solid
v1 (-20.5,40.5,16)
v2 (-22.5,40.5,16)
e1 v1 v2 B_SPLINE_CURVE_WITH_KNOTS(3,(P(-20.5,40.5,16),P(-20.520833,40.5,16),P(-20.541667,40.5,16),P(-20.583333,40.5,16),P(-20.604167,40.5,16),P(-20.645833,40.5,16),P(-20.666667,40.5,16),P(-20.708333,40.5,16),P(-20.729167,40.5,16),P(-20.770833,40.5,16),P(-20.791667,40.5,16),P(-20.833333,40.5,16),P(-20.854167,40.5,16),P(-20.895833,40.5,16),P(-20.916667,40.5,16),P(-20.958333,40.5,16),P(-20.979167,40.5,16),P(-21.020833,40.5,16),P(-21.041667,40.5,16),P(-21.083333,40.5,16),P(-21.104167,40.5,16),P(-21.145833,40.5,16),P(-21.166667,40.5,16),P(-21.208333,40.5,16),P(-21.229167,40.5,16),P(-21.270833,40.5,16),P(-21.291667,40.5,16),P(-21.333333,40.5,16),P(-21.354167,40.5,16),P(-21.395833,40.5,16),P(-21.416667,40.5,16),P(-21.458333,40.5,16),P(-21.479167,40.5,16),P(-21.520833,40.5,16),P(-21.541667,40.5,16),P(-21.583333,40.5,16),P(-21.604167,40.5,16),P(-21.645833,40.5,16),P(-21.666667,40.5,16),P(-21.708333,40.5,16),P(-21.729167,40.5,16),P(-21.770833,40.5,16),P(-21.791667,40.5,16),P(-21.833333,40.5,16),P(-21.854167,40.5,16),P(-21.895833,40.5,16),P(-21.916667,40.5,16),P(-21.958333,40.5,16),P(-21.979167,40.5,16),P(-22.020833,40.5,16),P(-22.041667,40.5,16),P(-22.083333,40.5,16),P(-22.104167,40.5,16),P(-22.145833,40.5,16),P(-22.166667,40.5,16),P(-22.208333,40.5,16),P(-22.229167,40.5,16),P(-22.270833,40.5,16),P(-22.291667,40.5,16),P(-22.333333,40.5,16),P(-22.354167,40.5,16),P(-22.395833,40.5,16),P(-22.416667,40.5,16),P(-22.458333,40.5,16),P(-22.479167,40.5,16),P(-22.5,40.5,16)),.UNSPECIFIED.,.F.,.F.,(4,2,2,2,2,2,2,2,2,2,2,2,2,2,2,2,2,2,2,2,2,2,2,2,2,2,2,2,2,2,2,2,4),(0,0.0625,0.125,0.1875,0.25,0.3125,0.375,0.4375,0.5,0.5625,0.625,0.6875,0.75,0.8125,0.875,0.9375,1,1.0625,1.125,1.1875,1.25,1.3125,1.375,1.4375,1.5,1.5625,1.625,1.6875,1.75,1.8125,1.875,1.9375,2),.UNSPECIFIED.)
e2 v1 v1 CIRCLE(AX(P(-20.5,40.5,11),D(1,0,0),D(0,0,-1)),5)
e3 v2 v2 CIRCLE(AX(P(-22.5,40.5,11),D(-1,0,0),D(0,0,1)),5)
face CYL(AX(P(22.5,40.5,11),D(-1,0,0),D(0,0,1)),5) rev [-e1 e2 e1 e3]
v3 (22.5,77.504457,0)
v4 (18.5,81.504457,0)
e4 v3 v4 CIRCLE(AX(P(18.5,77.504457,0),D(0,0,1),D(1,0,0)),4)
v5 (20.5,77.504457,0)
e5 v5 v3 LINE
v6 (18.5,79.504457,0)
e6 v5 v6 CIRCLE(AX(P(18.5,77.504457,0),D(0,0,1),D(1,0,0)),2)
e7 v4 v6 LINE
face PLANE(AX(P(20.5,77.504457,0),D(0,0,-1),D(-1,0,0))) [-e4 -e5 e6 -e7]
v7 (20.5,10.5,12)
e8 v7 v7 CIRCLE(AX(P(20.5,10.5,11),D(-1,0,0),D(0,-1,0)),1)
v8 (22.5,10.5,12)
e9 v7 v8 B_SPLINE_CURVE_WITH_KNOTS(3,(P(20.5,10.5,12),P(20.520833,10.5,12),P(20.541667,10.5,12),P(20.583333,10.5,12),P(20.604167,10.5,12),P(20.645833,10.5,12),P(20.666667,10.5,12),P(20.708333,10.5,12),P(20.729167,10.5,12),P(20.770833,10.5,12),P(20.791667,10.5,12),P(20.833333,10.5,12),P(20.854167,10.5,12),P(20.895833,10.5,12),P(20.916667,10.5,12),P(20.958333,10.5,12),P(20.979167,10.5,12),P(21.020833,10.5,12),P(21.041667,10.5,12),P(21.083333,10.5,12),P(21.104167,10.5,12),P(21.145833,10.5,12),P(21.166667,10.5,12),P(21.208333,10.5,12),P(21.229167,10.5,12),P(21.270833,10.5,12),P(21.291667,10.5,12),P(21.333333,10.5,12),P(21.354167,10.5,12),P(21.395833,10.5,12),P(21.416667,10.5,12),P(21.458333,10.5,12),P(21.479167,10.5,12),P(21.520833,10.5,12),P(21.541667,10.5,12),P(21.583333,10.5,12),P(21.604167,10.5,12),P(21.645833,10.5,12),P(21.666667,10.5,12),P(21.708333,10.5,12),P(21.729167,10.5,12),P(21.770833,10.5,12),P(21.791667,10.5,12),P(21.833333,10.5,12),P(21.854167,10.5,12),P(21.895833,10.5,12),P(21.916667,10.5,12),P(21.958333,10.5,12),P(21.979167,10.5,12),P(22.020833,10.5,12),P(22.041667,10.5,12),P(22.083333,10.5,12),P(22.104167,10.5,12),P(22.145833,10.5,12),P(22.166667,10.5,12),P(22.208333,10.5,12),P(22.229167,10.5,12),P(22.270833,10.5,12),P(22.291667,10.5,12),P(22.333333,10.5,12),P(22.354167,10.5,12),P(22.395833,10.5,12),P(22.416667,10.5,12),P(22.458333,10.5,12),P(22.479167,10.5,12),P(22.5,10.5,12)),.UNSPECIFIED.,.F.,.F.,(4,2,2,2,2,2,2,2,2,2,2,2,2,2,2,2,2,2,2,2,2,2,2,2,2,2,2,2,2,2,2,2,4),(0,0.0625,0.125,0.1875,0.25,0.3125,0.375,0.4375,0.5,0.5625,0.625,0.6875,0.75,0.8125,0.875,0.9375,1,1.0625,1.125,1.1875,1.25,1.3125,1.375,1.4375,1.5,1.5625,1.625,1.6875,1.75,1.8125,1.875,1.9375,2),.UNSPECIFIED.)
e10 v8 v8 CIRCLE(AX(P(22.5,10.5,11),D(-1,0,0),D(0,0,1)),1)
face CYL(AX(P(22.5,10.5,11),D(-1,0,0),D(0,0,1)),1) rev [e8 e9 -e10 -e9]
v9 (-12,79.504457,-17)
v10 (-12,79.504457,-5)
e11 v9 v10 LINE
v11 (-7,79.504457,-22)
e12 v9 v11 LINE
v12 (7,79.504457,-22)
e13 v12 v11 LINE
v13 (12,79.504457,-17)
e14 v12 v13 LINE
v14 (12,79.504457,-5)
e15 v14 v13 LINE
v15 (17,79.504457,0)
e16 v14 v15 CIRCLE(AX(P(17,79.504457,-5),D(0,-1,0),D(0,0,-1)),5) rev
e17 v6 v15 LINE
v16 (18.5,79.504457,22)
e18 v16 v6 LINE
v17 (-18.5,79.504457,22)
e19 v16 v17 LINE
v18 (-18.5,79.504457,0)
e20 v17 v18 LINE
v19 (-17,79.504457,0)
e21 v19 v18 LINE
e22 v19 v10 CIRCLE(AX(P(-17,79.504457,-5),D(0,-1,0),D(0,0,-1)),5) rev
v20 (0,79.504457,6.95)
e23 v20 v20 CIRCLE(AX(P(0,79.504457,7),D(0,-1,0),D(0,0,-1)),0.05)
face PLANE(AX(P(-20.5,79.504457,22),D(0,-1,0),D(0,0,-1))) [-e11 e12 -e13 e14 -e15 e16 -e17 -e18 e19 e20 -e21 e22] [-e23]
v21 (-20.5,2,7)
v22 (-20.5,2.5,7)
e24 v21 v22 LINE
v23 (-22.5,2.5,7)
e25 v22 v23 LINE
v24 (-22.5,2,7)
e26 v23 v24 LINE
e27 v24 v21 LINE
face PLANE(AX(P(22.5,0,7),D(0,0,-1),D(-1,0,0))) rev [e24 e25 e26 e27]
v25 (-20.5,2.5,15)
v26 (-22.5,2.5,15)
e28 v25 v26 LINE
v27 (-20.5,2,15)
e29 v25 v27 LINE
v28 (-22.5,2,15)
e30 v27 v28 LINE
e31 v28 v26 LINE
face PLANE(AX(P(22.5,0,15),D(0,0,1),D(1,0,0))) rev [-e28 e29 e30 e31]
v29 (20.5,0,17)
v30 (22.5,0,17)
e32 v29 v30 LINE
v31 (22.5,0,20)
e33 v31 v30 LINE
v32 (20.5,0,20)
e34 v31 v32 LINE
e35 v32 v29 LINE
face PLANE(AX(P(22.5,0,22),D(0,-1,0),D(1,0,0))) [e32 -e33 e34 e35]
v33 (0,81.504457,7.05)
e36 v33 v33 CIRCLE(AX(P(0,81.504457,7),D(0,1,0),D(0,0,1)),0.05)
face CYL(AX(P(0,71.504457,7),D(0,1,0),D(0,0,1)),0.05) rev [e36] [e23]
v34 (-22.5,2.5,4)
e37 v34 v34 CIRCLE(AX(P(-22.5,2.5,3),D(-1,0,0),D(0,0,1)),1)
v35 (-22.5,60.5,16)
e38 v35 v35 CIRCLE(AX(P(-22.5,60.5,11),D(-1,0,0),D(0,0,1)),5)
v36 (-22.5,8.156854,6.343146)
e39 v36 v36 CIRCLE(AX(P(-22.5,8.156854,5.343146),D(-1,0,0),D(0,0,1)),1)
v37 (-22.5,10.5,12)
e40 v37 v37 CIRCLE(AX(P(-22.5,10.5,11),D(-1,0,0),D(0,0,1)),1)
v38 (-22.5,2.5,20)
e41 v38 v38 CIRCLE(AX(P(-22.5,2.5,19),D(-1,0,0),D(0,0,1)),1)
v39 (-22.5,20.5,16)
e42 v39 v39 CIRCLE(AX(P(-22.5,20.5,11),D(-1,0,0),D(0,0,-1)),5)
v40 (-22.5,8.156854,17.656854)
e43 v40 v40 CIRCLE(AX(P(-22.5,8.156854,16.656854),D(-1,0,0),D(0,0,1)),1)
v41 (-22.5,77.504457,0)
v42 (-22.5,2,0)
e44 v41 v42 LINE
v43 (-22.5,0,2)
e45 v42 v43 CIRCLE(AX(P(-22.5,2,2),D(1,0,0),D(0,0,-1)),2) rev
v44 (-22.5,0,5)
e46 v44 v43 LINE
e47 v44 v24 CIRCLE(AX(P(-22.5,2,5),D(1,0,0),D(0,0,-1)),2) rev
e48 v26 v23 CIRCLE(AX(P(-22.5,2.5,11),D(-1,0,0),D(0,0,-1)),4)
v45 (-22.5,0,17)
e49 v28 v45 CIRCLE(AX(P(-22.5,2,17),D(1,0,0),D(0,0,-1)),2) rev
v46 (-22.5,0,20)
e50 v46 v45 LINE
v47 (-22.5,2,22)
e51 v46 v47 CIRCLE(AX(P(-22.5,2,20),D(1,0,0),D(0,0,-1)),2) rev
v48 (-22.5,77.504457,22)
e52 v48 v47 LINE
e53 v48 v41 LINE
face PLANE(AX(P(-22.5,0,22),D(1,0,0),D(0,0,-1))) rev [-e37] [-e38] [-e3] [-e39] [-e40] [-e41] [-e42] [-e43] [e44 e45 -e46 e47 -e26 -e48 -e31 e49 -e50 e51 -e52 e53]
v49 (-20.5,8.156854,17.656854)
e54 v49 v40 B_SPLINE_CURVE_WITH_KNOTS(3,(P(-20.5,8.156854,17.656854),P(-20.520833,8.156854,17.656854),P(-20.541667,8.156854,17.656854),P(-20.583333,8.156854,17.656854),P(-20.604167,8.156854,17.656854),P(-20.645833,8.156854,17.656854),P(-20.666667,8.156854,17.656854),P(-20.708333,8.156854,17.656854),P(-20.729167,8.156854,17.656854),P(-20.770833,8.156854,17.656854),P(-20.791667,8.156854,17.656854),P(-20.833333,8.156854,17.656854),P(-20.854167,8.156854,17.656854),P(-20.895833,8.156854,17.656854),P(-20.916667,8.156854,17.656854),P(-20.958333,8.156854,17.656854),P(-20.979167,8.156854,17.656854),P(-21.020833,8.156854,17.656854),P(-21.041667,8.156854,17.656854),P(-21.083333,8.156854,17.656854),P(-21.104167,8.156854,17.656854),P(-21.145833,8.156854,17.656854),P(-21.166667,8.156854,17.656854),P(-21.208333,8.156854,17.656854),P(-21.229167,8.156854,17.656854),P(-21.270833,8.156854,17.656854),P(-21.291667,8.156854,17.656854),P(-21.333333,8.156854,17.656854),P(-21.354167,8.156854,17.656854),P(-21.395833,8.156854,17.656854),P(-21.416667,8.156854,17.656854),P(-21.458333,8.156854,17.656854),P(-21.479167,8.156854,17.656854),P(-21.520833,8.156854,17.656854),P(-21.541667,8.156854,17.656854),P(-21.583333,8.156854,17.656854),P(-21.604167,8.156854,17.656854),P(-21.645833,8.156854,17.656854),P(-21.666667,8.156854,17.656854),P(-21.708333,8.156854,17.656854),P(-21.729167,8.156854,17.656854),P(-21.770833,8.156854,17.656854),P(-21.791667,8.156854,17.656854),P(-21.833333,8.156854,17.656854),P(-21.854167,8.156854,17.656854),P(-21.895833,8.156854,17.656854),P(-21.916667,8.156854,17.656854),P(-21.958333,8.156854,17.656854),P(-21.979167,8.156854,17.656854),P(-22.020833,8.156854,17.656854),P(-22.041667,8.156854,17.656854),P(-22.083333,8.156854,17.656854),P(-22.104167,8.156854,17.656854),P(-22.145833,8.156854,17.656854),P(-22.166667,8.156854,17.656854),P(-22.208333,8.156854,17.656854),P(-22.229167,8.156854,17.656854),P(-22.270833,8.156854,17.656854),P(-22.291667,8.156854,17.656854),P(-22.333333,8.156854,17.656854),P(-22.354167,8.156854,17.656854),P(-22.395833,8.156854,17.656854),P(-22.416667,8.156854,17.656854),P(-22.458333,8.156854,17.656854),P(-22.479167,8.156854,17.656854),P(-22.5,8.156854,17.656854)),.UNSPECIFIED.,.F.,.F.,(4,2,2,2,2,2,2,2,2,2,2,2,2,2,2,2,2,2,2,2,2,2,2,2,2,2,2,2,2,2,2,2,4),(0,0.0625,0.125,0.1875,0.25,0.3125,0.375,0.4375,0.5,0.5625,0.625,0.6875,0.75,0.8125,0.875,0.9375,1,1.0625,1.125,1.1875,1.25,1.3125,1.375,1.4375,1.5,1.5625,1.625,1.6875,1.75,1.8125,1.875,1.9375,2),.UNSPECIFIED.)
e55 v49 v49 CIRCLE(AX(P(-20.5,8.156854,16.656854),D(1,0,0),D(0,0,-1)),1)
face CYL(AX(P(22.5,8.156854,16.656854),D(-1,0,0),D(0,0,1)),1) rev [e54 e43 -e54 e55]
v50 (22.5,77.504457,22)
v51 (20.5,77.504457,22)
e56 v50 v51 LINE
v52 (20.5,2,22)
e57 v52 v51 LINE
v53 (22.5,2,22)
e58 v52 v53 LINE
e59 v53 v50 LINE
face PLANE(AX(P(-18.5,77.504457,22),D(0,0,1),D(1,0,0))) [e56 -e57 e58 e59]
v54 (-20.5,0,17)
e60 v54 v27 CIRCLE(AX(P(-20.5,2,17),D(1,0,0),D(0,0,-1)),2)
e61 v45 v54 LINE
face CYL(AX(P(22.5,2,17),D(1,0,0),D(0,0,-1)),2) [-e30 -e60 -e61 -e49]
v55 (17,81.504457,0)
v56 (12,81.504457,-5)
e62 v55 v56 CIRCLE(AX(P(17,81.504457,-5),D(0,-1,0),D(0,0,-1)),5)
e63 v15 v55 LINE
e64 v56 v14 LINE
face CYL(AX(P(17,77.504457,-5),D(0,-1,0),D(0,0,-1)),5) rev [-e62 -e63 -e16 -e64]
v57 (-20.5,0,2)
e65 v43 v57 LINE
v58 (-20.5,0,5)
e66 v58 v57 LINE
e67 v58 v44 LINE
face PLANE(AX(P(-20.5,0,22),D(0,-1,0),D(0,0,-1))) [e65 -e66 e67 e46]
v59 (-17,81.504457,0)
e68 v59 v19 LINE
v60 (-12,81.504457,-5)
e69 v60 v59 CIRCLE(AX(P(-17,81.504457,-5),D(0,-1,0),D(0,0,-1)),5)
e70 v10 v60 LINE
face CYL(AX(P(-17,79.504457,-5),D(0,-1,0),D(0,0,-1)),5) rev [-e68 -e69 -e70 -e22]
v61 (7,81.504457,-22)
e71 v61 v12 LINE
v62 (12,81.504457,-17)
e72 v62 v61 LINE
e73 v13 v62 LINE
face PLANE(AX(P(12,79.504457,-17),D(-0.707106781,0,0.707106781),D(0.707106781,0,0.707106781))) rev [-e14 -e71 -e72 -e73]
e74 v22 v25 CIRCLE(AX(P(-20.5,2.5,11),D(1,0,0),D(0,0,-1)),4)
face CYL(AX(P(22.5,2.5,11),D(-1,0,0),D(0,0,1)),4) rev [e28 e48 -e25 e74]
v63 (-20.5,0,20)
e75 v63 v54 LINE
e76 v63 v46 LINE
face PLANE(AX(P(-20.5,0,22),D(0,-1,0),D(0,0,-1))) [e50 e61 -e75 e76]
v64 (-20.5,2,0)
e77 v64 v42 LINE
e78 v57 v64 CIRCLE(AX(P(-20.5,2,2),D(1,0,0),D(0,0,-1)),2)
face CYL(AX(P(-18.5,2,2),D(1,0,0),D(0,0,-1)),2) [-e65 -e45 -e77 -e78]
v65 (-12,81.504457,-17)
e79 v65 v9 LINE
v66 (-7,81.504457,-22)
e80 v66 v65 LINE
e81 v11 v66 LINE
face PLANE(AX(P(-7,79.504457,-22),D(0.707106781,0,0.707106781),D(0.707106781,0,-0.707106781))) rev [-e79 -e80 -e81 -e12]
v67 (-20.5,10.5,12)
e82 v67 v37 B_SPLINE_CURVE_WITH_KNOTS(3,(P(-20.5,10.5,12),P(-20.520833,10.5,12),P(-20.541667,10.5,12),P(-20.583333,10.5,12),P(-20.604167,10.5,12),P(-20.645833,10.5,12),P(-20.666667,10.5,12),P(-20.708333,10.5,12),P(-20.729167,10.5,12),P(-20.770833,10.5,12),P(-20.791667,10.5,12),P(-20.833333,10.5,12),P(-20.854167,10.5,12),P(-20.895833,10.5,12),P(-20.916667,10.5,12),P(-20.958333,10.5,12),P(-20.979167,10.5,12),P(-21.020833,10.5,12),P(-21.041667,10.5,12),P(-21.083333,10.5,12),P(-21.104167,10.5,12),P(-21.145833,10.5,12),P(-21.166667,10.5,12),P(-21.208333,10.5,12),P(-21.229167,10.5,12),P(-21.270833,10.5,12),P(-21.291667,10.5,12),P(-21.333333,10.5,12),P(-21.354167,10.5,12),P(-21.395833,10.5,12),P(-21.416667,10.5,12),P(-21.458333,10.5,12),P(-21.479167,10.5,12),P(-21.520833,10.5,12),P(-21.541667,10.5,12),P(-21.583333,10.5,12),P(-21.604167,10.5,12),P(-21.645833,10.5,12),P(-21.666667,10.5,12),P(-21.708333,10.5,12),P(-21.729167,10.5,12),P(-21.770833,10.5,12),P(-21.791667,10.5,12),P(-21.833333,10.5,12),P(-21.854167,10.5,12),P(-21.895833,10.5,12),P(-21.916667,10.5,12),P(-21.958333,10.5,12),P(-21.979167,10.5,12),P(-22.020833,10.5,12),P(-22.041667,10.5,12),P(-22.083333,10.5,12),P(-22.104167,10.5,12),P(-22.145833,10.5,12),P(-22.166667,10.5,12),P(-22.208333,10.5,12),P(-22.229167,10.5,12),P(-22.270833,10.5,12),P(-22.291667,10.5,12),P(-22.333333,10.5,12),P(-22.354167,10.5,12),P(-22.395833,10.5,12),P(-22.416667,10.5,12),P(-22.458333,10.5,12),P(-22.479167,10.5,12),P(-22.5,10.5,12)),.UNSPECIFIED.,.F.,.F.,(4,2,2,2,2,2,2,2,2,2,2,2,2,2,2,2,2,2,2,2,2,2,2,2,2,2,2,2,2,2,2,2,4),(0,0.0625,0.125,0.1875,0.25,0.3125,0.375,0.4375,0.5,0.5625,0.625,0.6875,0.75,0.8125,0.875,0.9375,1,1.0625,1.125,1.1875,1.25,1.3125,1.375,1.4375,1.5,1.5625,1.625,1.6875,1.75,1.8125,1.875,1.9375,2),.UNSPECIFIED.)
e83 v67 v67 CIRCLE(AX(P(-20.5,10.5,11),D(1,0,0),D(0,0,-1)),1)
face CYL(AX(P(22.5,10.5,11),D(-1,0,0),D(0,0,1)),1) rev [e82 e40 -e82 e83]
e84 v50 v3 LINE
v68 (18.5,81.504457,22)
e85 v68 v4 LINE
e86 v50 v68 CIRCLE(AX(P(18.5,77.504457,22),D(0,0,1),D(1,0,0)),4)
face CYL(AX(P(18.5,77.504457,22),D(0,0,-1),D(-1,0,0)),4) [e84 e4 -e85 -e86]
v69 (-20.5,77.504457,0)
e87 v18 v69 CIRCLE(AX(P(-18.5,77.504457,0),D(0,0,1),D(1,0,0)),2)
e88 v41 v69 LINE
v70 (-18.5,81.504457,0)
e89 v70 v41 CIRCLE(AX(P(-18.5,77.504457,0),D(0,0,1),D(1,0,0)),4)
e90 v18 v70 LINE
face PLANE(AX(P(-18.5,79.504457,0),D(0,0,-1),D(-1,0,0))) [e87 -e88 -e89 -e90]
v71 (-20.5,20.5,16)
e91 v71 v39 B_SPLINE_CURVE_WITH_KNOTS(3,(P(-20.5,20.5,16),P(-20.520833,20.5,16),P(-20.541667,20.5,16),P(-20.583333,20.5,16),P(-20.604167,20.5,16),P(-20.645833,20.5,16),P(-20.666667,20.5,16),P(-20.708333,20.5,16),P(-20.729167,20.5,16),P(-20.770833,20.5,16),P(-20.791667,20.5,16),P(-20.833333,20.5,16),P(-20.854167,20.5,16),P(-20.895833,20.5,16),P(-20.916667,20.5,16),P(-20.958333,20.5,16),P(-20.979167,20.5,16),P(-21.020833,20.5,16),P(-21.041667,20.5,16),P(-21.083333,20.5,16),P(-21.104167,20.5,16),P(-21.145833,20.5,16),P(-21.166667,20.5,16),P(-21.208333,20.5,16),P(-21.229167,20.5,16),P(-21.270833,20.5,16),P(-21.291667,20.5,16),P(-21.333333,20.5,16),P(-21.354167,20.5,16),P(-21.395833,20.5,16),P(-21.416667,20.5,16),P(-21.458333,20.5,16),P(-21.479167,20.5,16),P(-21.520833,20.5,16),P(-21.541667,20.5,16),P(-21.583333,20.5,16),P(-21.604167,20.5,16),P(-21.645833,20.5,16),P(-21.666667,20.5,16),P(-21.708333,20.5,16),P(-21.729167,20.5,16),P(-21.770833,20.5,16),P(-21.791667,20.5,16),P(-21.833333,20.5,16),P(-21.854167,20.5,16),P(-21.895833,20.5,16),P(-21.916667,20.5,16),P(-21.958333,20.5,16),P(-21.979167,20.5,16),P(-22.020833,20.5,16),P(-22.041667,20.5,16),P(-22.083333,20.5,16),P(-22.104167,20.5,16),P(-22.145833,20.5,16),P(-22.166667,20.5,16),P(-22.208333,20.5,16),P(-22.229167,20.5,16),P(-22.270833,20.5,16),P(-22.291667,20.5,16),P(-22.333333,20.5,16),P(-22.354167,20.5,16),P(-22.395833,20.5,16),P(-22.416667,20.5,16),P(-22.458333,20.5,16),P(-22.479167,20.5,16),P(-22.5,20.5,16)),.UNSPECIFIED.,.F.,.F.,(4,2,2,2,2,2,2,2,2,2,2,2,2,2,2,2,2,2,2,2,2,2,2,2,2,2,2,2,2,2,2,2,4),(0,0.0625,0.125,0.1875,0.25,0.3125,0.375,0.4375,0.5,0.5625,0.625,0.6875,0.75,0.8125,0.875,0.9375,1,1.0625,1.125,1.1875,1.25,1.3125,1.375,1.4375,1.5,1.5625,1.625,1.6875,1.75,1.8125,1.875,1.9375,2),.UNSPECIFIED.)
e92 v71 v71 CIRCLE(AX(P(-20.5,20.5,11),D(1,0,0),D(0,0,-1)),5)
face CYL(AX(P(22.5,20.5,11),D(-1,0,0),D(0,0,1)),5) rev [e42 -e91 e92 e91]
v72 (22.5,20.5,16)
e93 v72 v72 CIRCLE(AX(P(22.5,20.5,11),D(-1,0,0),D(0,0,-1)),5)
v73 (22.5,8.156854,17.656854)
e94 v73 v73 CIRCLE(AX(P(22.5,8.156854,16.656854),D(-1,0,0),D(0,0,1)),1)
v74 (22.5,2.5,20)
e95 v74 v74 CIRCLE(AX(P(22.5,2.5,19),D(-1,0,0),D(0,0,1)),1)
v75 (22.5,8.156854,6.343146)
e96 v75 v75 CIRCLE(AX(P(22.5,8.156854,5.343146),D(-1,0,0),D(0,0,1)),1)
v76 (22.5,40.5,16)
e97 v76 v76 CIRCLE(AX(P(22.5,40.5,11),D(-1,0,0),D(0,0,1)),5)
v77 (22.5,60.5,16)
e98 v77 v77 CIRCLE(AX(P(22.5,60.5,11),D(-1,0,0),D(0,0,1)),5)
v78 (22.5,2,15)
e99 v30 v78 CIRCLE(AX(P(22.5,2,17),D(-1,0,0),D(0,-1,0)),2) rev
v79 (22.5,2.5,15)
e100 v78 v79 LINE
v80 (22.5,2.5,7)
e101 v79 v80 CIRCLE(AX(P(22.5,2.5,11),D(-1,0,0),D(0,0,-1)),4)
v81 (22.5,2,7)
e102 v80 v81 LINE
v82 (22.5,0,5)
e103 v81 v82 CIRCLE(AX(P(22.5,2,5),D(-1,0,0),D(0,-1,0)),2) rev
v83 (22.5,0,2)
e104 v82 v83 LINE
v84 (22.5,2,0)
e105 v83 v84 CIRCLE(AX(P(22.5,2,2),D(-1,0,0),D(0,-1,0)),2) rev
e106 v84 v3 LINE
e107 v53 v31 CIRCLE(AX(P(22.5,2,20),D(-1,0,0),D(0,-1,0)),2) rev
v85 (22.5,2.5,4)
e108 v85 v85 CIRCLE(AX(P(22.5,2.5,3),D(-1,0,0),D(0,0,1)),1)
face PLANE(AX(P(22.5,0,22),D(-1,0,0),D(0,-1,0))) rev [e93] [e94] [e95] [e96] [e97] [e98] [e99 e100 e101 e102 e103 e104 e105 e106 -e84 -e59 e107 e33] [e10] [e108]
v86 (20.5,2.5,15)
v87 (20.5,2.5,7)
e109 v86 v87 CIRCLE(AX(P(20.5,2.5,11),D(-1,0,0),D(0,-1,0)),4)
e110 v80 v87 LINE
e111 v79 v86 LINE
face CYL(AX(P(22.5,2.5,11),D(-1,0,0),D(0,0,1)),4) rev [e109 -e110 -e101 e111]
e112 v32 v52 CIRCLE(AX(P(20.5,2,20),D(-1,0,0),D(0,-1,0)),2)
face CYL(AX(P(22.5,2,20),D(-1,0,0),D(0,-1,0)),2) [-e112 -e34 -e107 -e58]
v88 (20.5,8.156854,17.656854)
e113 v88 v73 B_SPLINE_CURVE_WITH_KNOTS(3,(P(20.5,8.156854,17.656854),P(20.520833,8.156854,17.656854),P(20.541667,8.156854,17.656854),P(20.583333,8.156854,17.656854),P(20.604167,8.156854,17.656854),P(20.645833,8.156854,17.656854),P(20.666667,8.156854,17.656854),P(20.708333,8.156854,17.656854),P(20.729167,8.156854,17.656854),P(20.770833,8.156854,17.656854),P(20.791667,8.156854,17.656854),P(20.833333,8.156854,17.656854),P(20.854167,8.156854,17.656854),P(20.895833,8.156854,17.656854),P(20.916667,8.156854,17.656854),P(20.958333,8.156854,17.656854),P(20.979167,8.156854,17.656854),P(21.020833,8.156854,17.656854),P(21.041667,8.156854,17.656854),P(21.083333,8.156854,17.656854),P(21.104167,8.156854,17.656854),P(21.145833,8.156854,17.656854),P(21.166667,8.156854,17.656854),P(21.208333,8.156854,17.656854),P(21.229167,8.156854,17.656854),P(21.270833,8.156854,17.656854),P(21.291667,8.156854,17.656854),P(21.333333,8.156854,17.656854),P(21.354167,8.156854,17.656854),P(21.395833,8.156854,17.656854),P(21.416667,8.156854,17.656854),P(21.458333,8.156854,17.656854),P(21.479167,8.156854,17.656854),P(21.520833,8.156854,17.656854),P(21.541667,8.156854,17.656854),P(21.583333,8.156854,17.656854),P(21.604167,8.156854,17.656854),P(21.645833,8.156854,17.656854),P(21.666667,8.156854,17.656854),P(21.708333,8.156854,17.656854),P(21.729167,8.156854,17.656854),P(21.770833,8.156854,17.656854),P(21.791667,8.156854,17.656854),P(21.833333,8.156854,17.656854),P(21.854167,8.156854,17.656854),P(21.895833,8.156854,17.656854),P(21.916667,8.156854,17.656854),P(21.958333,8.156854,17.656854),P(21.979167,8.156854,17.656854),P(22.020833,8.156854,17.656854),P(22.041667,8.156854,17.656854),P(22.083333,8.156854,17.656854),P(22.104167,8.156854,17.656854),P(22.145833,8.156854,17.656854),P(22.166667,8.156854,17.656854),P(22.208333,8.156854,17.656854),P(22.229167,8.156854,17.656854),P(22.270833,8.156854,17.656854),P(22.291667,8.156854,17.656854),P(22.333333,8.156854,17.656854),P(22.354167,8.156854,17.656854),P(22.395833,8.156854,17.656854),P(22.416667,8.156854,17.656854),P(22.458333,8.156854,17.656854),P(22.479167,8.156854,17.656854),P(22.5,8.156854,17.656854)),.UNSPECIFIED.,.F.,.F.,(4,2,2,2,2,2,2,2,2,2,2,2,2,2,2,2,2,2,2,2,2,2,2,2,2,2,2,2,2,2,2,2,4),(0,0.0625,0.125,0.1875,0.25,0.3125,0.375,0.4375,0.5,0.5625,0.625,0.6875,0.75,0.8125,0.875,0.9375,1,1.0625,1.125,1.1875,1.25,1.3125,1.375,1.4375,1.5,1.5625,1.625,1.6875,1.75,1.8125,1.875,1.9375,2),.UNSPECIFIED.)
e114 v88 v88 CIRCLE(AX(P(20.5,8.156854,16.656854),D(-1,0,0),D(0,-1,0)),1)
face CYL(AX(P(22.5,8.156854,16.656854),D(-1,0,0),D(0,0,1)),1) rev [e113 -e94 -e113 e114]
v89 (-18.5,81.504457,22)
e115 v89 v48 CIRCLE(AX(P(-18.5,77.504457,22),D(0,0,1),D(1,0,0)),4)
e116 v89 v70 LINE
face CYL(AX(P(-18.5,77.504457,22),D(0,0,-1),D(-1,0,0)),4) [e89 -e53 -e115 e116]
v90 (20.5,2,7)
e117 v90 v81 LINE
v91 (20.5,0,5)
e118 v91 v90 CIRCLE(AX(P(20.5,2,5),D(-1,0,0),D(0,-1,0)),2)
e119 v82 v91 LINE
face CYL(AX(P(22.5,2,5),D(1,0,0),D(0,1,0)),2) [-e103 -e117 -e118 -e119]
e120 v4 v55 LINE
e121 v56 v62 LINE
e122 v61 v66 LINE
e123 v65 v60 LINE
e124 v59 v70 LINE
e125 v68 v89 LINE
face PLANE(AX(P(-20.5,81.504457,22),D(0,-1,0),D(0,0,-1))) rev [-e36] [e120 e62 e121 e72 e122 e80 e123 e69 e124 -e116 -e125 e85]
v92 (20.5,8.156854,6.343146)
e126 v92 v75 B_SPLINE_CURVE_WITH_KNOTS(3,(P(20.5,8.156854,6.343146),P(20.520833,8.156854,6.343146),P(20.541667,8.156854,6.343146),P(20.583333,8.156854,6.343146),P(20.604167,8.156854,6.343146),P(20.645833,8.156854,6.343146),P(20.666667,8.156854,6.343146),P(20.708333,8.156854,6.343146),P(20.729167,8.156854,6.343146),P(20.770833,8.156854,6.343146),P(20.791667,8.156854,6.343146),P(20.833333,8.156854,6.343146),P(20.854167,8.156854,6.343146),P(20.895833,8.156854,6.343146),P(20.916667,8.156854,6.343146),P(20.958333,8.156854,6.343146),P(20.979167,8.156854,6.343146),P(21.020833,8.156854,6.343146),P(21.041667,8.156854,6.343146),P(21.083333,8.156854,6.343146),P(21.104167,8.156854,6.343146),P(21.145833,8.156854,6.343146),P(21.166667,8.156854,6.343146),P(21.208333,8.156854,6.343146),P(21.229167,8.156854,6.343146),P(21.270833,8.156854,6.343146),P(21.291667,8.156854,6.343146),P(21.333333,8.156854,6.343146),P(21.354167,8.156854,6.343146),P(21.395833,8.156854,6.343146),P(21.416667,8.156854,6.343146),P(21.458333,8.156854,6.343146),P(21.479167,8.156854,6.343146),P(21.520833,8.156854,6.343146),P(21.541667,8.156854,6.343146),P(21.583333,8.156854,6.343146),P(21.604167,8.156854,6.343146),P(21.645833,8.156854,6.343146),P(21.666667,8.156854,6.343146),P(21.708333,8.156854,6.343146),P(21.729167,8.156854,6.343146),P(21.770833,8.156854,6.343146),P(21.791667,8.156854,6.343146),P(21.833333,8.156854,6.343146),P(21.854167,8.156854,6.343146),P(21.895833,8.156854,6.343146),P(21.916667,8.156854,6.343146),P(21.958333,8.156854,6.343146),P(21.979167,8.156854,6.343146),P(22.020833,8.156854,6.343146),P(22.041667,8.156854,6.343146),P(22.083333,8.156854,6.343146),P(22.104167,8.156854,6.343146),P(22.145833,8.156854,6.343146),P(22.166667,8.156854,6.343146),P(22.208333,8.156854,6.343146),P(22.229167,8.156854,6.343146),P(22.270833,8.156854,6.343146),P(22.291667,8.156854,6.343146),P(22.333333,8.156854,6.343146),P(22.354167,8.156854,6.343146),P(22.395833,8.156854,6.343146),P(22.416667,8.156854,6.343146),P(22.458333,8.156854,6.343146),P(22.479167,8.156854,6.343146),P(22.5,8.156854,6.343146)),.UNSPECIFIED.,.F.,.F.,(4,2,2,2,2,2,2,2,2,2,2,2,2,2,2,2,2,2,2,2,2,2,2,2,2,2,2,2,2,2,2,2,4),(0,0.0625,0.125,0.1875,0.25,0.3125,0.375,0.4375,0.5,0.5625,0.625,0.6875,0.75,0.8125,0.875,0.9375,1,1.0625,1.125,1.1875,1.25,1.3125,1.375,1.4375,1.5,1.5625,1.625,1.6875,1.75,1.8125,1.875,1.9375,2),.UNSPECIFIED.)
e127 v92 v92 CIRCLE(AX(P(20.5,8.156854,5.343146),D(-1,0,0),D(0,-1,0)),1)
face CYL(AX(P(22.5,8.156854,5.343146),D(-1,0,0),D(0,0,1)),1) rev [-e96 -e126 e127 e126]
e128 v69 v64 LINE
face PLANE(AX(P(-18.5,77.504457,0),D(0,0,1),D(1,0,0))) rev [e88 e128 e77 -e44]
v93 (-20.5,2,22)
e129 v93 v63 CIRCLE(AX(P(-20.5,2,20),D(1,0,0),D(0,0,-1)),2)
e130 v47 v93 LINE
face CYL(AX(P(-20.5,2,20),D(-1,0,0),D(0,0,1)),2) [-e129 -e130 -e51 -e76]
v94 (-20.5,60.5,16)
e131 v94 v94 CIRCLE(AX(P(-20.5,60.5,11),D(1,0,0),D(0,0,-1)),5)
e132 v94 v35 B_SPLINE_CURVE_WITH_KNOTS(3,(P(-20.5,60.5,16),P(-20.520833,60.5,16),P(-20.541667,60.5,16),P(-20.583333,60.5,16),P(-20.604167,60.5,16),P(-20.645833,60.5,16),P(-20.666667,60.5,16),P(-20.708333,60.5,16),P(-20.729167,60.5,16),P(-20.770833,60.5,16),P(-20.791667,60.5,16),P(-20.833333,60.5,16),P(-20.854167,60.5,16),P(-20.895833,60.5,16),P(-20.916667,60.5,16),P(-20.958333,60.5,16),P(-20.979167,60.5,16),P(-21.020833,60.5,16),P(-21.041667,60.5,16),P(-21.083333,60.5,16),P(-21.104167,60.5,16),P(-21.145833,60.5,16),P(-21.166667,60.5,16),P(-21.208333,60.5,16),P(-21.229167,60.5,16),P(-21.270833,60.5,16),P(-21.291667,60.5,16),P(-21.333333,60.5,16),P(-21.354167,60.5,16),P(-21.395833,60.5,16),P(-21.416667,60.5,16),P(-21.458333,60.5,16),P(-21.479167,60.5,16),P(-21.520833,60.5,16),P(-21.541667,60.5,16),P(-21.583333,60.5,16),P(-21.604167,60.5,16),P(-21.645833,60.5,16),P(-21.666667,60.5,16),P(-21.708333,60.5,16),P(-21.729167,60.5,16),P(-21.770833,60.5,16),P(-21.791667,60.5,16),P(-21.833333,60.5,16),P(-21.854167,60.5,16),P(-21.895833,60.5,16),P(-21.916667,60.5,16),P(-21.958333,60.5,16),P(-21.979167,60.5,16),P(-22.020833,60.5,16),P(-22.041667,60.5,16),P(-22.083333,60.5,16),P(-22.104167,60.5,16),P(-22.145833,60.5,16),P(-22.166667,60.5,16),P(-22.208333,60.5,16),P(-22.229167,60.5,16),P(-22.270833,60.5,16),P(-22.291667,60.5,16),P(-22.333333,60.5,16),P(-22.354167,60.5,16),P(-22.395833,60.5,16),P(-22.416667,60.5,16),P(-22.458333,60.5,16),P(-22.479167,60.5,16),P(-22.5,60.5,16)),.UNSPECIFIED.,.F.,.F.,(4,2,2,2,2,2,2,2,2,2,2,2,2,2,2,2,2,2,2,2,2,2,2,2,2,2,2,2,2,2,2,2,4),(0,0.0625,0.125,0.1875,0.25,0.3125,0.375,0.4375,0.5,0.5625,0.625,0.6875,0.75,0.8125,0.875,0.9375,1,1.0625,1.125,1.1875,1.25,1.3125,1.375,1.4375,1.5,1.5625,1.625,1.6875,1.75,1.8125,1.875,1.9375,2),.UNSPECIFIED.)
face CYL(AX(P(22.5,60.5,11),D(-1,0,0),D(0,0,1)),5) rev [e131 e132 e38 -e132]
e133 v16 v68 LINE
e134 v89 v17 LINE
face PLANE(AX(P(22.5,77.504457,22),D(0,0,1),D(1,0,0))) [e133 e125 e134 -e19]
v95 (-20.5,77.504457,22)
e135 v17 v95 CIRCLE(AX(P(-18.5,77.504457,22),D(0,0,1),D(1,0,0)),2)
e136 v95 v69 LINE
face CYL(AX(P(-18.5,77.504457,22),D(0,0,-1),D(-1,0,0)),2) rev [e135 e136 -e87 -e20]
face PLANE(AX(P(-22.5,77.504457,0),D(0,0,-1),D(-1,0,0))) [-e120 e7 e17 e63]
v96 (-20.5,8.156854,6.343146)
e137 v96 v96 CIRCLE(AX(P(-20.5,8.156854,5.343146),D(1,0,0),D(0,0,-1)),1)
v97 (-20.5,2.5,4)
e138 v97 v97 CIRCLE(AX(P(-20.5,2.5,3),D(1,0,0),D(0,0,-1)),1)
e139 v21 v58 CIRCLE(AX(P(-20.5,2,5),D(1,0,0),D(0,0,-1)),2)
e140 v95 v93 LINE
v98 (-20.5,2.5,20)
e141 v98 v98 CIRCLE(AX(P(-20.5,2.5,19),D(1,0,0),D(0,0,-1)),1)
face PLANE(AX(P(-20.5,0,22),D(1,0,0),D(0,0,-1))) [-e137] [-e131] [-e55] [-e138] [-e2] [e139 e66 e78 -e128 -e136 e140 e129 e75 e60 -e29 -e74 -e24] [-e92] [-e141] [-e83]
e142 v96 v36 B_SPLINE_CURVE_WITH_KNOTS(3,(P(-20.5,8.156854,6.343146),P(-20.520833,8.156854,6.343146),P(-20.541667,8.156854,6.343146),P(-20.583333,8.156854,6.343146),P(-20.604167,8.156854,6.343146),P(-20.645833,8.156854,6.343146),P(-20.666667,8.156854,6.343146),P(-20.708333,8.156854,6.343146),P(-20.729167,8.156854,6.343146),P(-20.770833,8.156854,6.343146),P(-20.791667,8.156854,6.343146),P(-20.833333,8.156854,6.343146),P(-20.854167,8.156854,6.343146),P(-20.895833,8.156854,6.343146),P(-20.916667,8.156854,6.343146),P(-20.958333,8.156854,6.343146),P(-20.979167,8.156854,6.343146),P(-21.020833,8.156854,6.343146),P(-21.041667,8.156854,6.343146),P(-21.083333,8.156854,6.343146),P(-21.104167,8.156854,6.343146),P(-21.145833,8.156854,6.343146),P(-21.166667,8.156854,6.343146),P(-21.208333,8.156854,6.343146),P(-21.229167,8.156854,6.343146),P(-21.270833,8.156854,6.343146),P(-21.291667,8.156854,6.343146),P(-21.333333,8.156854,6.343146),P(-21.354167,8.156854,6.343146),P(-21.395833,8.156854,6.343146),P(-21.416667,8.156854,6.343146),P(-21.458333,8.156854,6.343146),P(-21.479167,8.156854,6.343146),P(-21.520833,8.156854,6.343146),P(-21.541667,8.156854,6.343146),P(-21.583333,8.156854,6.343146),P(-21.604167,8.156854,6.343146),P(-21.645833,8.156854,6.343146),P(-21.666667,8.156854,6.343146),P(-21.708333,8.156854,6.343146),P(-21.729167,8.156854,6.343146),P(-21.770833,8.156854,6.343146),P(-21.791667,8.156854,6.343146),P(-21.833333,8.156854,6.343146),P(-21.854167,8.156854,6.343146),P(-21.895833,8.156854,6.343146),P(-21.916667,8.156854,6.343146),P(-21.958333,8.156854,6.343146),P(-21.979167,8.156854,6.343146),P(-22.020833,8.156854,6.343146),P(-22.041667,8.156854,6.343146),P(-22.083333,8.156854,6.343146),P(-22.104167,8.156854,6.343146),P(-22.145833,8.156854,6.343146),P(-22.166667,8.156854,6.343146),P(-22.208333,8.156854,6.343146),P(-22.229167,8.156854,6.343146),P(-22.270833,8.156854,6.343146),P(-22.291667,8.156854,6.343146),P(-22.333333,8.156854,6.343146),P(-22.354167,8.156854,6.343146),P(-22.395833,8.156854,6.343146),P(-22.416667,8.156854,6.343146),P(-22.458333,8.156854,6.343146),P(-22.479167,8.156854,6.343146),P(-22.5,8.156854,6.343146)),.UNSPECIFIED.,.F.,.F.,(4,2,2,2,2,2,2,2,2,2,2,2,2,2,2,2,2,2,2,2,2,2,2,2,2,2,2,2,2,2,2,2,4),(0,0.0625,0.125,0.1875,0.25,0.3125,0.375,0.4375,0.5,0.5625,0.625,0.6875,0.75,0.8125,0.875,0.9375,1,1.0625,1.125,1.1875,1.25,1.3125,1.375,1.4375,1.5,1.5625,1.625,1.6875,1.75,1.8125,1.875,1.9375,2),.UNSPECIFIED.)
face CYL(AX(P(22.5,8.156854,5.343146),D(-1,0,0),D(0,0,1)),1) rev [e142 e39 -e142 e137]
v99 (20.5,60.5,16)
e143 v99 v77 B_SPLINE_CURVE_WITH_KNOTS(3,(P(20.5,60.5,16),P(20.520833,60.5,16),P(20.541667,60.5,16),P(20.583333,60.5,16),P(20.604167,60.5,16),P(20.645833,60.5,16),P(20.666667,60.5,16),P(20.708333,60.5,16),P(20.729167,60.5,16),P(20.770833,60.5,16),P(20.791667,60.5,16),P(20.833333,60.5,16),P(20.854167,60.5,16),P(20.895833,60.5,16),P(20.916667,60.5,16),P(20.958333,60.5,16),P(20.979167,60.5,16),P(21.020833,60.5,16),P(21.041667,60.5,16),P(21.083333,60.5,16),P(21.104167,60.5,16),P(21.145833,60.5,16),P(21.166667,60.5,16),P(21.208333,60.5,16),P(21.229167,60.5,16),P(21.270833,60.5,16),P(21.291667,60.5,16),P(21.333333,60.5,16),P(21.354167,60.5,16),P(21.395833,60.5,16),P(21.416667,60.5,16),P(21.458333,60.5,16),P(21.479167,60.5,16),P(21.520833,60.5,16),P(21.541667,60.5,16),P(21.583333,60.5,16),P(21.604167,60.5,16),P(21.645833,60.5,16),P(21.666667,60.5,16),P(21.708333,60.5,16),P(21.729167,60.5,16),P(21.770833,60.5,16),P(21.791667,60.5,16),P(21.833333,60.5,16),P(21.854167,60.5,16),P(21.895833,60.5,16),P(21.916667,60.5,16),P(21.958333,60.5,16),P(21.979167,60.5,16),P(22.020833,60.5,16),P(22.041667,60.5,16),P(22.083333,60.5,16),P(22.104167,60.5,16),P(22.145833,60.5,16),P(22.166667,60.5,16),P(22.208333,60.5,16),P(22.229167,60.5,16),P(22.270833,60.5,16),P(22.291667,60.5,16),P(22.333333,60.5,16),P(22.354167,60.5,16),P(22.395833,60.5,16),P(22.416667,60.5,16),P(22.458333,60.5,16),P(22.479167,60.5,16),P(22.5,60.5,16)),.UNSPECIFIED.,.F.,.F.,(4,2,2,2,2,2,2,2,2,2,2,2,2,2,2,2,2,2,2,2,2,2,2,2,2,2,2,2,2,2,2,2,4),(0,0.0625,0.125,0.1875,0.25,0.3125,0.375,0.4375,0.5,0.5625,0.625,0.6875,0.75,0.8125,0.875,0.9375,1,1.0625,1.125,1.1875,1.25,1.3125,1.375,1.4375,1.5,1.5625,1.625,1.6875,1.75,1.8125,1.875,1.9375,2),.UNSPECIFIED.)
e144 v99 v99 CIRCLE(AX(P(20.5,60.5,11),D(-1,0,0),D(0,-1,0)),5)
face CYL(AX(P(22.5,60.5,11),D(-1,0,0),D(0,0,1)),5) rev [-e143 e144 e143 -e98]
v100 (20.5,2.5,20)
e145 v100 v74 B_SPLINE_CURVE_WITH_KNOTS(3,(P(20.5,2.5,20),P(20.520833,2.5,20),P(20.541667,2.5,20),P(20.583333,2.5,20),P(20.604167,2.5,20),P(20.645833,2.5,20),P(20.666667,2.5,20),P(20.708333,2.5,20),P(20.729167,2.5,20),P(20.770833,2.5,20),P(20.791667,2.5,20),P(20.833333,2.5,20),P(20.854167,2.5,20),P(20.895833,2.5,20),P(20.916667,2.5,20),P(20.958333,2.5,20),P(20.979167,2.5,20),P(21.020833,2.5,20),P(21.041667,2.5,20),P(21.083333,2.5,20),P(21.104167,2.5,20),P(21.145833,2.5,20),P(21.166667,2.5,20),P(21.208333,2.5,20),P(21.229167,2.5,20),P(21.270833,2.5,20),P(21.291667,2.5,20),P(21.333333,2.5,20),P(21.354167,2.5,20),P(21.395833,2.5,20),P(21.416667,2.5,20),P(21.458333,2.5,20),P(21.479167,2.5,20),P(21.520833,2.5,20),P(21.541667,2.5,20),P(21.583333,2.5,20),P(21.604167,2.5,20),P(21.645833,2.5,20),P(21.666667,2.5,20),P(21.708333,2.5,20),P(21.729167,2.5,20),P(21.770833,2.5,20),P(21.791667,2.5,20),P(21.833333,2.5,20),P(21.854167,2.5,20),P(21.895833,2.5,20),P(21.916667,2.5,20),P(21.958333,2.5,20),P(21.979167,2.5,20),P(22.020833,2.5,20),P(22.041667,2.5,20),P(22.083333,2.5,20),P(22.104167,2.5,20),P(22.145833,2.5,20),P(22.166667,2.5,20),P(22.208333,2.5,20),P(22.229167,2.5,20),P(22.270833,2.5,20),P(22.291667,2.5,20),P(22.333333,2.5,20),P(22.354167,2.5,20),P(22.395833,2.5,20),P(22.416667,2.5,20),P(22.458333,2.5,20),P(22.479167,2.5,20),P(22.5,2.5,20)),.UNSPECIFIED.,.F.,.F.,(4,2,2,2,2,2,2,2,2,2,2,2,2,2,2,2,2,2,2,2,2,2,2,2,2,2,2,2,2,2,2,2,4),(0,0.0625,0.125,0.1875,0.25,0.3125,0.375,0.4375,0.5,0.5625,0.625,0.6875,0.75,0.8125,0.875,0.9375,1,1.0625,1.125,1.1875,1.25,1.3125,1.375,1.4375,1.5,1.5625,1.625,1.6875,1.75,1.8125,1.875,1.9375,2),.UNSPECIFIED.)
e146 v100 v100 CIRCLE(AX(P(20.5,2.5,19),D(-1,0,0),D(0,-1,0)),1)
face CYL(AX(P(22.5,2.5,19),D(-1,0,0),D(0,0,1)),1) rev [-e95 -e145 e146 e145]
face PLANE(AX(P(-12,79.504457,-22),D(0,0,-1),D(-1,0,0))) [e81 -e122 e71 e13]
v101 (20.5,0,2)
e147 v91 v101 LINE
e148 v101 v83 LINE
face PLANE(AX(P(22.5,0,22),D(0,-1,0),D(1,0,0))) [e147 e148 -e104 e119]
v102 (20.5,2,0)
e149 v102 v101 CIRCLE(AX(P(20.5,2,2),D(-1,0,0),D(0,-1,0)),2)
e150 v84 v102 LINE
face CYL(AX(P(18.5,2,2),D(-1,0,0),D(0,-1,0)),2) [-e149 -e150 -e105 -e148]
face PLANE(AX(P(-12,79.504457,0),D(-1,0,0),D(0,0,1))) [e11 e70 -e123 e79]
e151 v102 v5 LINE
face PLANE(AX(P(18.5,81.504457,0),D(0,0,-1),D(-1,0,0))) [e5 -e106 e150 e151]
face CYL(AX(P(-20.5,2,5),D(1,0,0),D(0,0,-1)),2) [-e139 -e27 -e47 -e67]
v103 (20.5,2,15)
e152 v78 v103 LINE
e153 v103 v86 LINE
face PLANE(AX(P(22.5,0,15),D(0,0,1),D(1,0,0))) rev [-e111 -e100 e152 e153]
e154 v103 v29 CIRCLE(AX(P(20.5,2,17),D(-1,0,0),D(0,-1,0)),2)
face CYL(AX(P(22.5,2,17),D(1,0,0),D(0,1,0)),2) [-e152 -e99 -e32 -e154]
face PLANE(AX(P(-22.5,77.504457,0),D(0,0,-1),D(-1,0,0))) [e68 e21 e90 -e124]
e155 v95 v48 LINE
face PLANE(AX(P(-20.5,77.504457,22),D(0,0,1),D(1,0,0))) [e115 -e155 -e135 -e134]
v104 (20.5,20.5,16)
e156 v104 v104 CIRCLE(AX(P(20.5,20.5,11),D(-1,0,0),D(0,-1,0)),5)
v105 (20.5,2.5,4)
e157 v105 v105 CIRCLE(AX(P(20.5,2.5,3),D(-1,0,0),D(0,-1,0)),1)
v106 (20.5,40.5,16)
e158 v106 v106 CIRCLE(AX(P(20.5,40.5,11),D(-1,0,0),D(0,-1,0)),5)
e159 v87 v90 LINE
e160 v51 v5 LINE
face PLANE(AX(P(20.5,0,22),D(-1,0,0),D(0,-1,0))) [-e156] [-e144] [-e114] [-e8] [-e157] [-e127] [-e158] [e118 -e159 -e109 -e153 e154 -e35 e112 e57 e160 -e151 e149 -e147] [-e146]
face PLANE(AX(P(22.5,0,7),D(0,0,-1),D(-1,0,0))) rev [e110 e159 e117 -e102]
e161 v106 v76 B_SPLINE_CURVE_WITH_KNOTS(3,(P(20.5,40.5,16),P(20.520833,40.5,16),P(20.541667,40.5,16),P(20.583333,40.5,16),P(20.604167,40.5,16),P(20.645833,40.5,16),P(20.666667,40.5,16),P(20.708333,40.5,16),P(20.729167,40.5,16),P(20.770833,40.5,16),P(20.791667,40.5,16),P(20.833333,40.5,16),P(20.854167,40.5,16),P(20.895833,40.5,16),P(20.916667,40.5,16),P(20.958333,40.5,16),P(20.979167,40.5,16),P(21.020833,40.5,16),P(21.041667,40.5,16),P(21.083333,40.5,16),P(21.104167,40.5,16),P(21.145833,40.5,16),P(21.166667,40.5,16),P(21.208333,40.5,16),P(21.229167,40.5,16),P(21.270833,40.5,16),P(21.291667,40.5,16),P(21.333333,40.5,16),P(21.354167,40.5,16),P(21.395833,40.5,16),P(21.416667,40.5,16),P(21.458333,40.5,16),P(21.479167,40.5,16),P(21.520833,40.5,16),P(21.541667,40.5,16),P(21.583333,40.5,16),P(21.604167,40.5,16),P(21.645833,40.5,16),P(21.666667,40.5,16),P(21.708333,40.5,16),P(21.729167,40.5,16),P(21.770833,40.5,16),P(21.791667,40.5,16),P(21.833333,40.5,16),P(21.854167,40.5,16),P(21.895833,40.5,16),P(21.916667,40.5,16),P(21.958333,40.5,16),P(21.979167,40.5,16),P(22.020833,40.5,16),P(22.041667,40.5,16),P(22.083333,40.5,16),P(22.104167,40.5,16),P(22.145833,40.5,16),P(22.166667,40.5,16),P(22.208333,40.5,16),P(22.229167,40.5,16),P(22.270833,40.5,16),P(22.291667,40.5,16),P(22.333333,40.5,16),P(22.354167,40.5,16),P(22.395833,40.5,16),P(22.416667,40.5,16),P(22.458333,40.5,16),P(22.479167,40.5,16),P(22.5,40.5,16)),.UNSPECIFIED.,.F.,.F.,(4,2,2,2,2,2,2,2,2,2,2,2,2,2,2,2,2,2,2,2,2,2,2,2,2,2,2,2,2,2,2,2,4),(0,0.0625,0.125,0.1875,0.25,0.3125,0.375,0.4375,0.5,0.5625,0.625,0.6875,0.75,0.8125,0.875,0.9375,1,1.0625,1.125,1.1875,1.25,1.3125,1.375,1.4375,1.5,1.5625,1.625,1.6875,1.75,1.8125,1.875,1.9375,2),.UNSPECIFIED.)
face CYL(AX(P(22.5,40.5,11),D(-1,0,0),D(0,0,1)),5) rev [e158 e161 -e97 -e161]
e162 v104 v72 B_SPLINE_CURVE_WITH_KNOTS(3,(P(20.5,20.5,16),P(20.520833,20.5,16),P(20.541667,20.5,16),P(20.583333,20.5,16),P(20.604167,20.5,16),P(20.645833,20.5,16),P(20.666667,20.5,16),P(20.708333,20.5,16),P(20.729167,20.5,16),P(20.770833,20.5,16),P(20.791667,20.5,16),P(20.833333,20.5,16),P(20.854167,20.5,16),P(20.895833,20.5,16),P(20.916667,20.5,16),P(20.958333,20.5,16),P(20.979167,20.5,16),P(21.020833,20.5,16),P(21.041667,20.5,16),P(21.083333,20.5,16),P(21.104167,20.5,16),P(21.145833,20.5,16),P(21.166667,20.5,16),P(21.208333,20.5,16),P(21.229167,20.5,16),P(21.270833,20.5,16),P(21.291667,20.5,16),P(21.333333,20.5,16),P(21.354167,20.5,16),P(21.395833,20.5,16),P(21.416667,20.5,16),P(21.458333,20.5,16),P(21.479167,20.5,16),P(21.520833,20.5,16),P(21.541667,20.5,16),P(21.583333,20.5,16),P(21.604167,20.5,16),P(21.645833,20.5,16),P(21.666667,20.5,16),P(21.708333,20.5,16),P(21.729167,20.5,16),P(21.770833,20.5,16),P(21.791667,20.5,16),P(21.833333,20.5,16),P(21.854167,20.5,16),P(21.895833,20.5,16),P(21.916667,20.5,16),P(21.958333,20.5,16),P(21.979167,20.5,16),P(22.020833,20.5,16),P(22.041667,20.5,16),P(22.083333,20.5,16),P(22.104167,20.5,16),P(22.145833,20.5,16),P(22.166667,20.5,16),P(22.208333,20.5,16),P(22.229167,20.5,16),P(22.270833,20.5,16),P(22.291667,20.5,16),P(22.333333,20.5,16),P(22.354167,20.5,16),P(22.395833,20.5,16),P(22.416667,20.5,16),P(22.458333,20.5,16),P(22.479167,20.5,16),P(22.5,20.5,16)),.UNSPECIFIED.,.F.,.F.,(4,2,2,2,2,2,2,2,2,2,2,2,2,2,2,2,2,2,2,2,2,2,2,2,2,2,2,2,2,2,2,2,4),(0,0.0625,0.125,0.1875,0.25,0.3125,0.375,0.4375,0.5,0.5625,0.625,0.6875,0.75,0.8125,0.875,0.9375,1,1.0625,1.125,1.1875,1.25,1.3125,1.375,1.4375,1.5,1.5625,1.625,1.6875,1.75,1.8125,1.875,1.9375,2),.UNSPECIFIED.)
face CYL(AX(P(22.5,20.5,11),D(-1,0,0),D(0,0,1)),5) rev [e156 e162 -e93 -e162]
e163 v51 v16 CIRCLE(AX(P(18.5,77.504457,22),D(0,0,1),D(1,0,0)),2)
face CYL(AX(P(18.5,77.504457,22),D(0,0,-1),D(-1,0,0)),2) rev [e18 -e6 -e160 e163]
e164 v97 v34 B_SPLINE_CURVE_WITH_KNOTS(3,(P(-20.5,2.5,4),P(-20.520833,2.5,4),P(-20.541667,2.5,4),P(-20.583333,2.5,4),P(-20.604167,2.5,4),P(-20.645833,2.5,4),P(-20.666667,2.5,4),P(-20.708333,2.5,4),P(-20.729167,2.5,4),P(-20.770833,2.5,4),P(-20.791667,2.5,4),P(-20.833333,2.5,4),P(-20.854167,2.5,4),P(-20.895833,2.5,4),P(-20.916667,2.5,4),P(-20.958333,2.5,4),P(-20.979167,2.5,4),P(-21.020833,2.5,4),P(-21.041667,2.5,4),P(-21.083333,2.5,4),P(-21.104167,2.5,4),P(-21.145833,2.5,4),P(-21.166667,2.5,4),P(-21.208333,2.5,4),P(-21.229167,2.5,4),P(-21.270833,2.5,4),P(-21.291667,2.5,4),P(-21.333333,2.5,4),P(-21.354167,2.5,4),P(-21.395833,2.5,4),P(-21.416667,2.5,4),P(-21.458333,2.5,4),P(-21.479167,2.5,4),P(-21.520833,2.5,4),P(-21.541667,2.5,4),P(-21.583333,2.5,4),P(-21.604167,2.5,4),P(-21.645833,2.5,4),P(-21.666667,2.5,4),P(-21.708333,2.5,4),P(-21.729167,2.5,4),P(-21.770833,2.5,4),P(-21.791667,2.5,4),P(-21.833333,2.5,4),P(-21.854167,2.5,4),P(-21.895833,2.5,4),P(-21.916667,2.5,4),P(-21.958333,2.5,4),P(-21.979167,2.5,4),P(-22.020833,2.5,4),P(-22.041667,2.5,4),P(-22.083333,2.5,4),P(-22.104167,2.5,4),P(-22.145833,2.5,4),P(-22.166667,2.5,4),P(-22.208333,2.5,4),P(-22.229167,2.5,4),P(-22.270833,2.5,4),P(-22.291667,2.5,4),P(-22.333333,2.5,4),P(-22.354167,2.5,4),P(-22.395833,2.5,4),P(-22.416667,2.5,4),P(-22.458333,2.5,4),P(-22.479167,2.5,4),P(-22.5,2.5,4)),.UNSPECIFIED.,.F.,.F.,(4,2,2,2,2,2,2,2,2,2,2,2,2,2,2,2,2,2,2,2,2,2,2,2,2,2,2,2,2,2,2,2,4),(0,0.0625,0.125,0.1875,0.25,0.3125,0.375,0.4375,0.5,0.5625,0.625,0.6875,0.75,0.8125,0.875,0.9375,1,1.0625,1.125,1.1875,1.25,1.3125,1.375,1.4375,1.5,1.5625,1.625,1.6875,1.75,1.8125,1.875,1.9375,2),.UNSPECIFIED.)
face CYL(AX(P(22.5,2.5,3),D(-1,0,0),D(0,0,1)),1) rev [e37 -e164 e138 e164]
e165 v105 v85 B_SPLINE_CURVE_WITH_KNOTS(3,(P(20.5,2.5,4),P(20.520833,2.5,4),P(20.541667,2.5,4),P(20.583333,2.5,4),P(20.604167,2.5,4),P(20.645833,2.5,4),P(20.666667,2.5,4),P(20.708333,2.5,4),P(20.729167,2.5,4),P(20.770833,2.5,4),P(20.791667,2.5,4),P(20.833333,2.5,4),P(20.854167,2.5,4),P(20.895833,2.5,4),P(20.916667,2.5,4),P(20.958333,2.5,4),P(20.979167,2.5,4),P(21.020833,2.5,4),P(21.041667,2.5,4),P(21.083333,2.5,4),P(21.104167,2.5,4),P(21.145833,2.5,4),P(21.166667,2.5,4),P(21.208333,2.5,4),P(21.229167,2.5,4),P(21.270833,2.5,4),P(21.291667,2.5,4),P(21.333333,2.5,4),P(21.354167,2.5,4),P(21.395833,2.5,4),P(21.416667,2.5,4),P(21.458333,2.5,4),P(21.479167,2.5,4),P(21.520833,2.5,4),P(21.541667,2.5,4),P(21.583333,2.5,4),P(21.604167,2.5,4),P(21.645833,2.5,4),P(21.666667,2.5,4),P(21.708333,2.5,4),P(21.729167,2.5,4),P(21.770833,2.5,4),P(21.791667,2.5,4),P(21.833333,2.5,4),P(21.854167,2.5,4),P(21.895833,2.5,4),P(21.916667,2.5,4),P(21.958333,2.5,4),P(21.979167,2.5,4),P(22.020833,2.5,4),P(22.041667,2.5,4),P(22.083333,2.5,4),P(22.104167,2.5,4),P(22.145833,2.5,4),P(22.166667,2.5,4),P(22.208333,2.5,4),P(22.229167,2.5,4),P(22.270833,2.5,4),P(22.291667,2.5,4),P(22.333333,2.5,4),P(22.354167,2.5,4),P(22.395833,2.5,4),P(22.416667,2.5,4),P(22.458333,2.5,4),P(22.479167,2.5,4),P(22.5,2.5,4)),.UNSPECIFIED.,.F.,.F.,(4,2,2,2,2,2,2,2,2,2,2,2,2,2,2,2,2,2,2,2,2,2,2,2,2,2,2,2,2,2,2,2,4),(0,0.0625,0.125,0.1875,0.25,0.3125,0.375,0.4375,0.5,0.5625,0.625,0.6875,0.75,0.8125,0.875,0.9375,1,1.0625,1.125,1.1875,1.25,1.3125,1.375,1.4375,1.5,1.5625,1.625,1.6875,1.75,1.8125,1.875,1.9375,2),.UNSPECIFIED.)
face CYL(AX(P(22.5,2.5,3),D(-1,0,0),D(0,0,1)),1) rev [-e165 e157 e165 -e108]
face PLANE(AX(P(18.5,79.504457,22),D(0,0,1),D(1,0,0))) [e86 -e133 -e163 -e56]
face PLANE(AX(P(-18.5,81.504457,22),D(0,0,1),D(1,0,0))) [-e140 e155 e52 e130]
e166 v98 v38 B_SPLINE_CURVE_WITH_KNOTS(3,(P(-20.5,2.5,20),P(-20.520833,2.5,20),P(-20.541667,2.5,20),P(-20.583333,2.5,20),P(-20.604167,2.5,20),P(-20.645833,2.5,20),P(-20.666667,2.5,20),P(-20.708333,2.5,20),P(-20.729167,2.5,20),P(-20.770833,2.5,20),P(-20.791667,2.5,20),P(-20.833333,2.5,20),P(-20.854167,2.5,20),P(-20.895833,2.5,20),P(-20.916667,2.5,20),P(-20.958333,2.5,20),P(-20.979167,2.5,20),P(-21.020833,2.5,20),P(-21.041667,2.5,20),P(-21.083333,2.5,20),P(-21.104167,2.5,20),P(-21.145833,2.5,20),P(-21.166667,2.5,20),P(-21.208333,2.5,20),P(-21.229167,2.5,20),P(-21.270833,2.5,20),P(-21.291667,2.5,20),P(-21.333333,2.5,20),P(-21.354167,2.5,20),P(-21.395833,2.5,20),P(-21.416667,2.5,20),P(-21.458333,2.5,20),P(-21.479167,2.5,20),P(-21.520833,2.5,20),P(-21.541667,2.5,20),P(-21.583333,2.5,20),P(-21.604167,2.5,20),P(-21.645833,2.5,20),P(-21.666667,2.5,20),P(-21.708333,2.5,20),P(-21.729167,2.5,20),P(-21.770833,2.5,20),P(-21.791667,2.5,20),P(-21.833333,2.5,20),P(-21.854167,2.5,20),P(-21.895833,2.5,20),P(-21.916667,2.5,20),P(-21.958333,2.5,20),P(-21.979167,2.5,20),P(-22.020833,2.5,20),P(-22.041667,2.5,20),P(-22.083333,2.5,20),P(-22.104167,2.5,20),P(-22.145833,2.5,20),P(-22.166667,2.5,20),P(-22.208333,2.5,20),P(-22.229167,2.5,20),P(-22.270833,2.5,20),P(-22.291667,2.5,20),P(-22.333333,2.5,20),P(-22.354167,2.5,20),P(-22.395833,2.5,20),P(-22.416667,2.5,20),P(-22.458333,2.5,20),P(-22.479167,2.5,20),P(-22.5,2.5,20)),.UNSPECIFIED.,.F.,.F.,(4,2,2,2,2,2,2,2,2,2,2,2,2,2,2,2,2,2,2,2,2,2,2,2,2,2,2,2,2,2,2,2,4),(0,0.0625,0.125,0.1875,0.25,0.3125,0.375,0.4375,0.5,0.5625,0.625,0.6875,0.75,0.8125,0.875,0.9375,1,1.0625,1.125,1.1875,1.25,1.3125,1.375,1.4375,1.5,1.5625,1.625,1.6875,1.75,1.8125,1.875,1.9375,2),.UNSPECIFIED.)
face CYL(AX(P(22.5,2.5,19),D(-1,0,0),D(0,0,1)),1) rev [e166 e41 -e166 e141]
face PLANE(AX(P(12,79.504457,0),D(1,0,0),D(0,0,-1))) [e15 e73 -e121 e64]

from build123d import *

# Parameters (mm, degrees)
BASE_FLANGE1_DEPTH = 22
CUT_EXTRUDE1_DEPTH = 96.665963068
FILLET1_R          = 2
SKETCH4_R          = 1
CUT_EXTRUDE2_DEPTH = 96.665963068
SKETCH5_W          = 24
SKETCH5_H          = 22
TAB1_DEPTH         = 2
SKETCH6_R          = 0.05
CUT_EXTRUDE3_DEPTH = 10
FILLET2_R          = 5
CHAMFER1_SIZE      = 5
SKETCH7_R          = 5
CUT_EXTRUDE4_DEPTH = 96.665963068


# Sheet-metal steps are written as plain solids
with BuildPart() as part:
    # Sketch1 → Base-Flange1 (new body)
    with BuildSketch(Plane.XY):
        with BuildLine():
            Line((-20.5, 0), (-20.5, 77.50445687))
            ThreePointArc((-20.5, 77.50445687), (-19.914213562, 78.918670432), (-18.5, 79.50445687))
            Line((-18.5, 79.50445687), (18.5, 79.50445687))
            ThreePointArc((18.5, 79.50445687), (19.914213562, 78.918670432), (20.5, 77.50445687))
            Line((20.5, 77.50445687), (20.5, 0))
            Line((20.5, 0), (22.5, 0))
            Line((22.5, 0), (22.5, 77.50445687))
            ThreePointArc((22.5, 77.50445687), (21.328427125, 80.332883995), (18.5, 81.50445687))
            Line((18.5, 81.50445687), (-18.5, 81.50445687))
            ThreePointArc((-18.5, 81.50445687), (-21.328427125, 80.332883995), (-22.5, 77.50445687))
            Line((-22.5, 77.50445687), (-22.5, 0))
            Line((-22.5, 0), (-20.5, 0))
        make_face()
    extrude(amount=BASE_FLANGE1_DEPTH)

    # Sketch3 → Cut-Extrude1 (cut, through all)
    with BuildSketch(Plane.ZY.offset(22.5)):
        with BuildLine():
            Line((7, 0), (15, 0))
            Line((15, 0), (15, 2.5))
            ThreePointArc((15, 2.5), (11, 6.5), (7, 2.5))
            Line((7, 2.5), (7, 0))
        make_face()
    extrude(amount=-CUT_EXTRUDE1_DEPTH, mode=Mode.SUBTRACT)

    # Fillet1
    fillet1_edges = [part.edges().sort_by_distance(p)[0] for p in [
        (21.5, 0, 0),
        (-21.5, 0, 0),
        (21.5, 0, 22),
        (-21.5, 0, 7),
        (-21.5, 0, 15),
        (21.5, 0, 7),
        (21.5, 0, 15),
        (-21.5, 0, 22),
    ]]
    fillet(fillet1_edges, radius=FILLET1_R)

    # Sketch4 → Cut-Extrude2 (cut, through all)
    with BuildSketch(Plane.ZY.offset(22.5)):
        with Locations((19, 2.5)):
            Circle(SKETCH4_R)
        with Locations((16.656854249, 8.156854249)):
            Circle(SKETCH4_R)
        with Locations((11, 10.5)):
            Circle(SKETCH4_R)
        with Locations((5.343145751, 8.156854249)):
            Circle(SKETCH4_R)
        with Locations((3, 2.5)):
            Circle(SKETCH4_R)
    extrude(amount=-CUT_EXTRUDE2_DEPTH, mode=Mode.SUBTRACT)

    # Sketch5 → Tab1 (add)
    with BuildSketch(Plane(origin=(0, 81.50445687, 0), x_dir=(1, 0, 0), z_dir=(0, 1, 0))):
        with Locations((0, 11)):
            Rectangle(SKETCH5_W, SKETCH5_H)
    extrude(amount=-TAB1_DEPTH)

    # Sketch6 → Cut-Extrude3 (cut)
    with BuildSketch(Plane(origin=(0, 81.50445687, 0), x_dir=(1, 0, 0), z_dir=(0, 1, 0))):
        with Locations(Location((0, -7, 0), (0, 0, 270))):
            Circle(SKETCH6_R)
    extrude(amount=-CUT_EXTRUDE3_DEPTH, mode=Mode.SUBTRACT)

    # Fillet2
    fillet2_edges = [part.edges().sort_by_distance(p)[0] for p in [
        (-12, 80.50445687, 0),
        (12, 80.50445687, 0),
    ]]
    fillet(fillet2_edges, radius=FILLET2_R)

    # Chamfer1
    chamfer1_edges = [part.edges().sort_by_distance(p)[0] for p in [
        (-12, 80.50445687, -22),
        (12, 80.50445687, -22),
    ]]
    chamfer(chamfer1_edges, length=CHAMFER1_SIZE)

    # Sketch7 → Cut-Extrude4 (cut, through all)
    with BuildSketch(Plane.ZY.offset(22.5)):
        with Locations((11, 40.5)):
            Circle(SKETCH7_R)
        with Locations((11, 60.5)):
            Circle(SKETCH7_R)
        with Locations((11, 20.5)):
            Circle(SKETCH7_R)
    extrude(amount=-CUT_EXTRUDE4_DEPTH, mode=Mode.SUBTRACT)


solid = part.part
